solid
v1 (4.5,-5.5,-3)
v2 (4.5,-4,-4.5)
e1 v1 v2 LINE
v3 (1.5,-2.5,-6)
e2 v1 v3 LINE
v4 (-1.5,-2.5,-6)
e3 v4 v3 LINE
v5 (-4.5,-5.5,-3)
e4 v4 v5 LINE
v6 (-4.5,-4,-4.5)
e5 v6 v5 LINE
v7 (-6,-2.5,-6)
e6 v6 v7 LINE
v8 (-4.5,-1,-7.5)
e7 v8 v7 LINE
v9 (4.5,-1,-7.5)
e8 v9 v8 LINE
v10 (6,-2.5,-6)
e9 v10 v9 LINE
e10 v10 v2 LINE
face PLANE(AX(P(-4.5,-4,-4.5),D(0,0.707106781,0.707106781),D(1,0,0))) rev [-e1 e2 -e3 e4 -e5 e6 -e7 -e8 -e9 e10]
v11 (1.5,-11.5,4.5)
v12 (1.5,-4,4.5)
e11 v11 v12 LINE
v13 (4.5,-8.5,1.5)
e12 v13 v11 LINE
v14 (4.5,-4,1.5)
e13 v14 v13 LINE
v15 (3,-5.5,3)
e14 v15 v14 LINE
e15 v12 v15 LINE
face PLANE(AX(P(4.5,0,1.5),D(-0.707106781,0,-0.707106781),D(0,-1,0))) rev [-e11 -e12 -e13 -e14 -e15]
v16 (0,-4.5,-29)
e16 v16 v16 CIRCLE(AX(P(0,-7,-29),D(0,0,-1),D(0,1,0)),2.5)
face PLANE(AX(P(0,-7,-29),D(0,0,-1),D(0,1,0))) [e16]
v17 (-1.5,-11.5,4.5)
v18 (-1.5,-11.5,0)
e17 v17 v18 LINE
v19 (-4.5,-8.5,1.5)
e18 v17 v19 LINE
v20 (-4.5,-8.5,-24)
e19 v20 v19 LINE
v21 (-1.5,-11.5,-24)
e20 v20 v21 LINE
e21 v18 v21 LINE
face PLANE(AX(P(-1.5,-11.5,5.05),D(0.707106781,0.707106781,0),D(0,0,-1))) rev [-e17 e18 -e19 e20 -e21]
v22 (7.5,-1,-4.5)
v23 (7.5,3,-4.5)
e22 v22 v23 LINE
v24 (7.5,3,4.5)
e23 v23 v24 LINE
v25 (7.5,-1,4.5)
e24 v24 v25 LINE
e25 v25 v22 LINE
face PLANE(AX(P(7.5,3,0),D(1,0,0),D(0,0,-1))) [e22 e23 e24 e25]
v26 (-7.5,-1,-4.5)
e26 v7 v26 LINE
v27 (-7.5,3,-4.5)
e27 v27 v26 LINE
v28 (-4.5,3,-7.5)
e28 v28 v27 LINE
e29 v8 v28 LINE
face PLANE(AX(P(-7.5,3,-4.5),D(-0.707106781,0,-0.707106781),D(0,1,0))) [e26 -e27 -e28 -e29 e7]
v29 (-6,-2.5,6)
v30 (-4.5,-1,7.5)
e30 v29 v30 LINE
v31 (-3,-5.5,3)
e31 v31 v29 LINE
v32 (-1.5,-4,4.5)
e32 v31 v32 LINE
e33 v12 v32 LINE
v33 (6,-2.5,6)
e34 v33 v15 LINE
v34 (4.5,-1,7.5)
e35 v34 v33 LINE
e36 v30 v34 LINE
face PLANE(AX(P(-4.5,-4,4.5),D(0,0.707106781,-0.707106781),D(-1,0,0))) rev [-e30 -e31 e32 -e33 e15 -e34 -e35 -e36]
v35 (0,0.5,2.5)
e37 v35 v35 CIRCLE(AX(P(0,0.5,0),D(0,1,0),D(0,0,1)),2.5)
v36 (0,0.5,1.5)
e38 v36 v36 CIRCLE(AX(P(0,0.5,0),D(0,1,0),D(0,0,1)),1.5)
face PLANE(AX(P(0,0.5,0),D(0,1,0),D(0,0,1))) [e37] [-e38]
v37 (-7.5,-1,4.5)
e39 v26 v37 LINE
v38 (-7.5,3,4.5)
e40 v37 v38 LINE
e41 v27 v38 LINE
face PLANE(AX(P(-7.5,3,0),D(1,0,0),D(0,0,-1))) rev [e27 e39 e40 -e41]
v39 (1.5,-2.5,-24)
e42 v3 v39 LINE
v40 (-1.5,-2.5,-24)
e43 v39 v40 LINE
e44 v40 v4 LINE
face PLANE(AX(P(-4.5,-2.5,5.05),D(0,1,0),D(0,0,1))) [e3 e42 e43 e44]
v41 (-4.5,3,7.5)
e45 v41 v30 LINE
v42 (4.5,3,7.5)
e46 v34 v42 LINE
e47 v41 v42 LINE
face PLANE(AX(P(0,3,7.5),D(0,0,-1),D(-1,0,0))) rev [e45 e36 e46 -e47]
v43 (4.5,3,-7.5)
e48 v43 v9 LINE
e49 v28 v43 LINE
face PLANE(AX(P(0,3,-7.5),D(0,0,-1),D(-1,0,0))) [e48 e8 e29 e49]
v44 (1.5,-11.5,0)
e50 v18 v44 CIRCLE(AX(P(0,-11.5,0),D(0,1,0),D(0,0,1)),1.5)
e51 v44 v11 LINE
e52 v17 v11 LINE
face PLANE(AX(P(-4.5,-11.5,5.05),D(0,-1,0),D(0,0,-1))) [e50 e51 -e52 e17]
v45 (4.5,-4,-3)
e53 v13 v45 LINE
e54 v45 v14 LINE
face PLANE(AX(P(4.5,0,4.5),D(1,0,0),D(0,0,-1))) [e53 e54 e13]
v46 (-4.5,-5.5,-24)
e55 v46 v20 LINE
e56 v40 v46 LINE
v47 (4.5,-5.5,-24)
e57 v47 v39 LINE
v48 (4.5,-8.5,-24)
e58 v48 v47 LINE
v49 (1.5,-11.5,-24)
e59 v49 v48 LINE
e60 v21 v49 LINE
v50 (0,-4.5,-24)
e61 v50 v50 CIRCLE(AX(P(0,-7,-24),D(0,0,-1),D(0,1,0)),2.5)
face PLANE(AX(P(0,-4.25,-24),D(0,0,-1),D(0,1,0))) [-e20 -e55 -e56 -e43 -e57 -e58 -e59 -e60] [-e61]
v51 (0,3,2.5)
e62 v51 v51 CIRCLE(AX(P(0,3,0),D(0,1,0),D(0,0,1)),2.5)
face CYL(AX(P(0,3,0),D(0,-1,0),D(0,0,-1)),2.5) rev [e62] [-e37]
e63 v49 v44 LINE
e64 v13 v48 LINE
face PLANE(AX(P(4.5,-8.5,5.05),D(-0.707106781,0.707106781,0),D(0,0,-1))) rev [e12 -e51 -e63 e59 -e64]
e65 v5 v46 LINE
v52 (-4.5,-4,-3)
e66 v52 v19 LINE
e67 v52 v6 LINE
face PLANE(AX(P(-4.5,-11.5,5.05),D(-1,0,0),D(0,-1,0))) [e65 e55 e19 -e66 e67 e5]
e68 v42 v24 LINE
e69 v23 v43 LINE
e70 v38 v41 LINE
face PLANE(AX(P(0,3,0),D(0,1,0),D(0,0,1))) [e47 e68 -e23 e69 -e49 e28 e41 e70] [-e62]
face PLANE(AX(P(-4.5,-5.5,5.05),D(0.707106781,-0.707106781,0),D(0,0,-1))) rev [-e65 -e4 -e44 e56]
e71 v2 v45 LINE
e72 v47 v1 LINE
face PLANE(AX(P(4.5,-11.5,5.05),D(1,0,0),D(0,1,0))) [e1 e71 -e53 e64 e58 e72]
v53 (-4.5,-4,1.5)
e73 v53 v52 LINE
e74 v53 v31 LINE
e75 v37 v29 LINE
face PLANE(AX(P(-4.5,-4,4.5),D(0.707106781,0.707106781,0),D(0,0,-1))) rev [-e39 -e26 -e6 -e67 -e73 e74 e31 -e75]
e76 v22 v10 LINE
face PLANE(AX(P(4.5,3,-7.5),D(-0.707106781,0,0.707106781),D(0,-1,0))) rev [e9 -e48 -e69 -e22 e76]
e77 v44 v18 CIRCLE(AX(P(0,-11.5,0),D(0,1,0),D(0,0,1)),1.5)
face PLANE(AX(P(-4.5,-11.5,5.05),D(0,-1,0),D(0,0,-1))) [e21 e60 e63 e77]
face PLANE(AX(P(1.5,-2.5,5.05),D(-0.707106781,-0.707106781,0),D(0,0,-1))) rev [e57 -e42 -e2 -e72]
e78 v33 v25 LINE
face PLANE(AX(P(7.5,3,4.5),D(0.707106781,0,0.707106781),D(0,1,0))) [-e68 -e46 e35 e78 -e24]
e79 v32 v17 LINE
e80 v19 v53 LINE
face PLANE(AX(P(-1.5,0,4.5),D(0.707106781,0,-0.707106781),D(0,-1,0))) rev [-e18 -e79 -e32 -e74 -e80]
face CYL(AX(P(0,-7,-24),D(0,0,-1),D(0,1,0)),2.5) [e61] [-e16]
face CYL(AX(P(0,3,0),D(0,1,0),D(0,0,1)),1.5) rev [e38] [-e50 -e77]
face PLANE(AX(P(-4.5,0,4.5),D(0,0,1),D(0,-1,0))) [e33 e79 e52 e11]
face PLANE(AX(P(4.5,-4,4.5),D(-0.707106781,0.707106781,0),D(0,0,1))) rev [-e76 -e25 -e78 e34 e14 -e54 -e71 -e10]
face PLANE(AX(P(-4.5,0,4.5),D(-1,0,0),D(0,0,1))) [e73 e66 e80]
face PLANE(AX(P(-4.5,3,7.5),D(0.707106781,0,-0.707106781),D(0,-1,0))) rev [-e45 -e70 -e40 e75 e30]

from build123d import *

# Parameters (mm, degrees)
SKETCH1_W                = 15
SKETCH1_H                = 15
SKETCH1_R                = 2.5
BOSS_EXTRUDE1_DEPTH      = 3
CHAMFER1_SIZE            = 3
SKETCH1_6_R              = 2.5
BOSS_EXTRUDE3_DEPTH      = 0.5
SKETCH18_W               = 9
SKETCH18_H               = 9
CHAMFER4_SIZE            = 4
CHAMFER5_SIZE            = 3
SKETCH19_OUTSIDE_W       = 25.408
SKETCH19_OUTSIDE_H       = 24.908
SKETCH19_OUTSIDE_R       = 2.5
CUT_EXTRUDE2_DEPTH       = 5
F_3_0_3_DIAMETER_HOLE1_D = 3


with BuildPart() as part:
    # Sketch1 → Boss-Extrude1 (new body)
    with BuildSketch(Plane(origin=(0, 0, 0), x_dir=(1, 0, 0), z_dir=(0, 1, 0))):
        Rectangle(SKETCH1_W, SKETCH1_H)
        with Locations(Location((0, 0, 0), (0, 0, 270))):
            Circle(SKETCH1_R, mode=Mode.SUBTRACT)
    extrude(amount=BOSS_EXTRUDE1_DEPTH)

    # Chamfer1
    chamfer1_edges = [part.edges().sort_by_distance(p)[0] for p in [
        (7.5, 1.5, 7.5),
        (-7.5, 1.5, 7.5),
        (-7.5, 1.5, -7.5),
        (7.5, 1.5, -7.5),
    ]]
    chamfer(chamfer1_edges, length=CHAMFER1_SIZE)

    # Sketch1<6> → Boss-Extrude3 (add)
    with BuildSketch(Plane(origin=(0, 0, 0), x_dir=(1, 0, 0), z_dir=(0, 1, 0))):
        with Locations(Location((0, 0, 0), (0, 0, 270))):
            Circle(SKETCH1_6_R)
    extrude(amount=BOSS_EXTRUDE3_DEPTH)

    # Sweep3: sweep along a path in Sketch2
    with BuildLine(Plane(origin=(0, 0, 0), x_dir=(0, 0, -1), z_dir=(1, 0, 0))) as sweep3_path:
        Line((0, 0), (0, -7))
        Line((0, -7), (29, -7))
    # Sketch18 → Sweep3 (sweep)
    with BuildSketch(Plane.XZ):
        Rectangle(SKETCH18_W, SKETCH18_H)
    sweep(path=sweep3_path.line, transition=Transition.RIGHT)

    # Chamfer4
    # the kernel refuses this chamfer: 4 mm, written as the material it adds along each edge
    with BuildSketch(Plane(origin=(-14.786731952, 0, -4.5), x_dir=(0, 0, -1), z_dir=(1, 0, 0))) as chamfer4_piece_1_section:
        Polygon((CHAMFER4_SIZE, 0), (0, -CHAMFER4_SIZE), (0, 0), align=None)
    chamfer4_piece_1 = extrude(amount=29.573463904, mode=Mode.PRIVATE)
    chamfer4_piece_1 = split(chamfer4_piece_1, bisect_by=Plane(origin=(-14.786731952, 0, -7.5), z_dir=(0, 0, 1)), keep=Keep.TOP, mode=Mode.PRIVATE)
    chamfer4_piece_1 = split(chamfer4_piece_1, bisect_by=Plane(origin=(-11.143365976, 0, -0.856634024), z_dir=(0.7071067811865476, 0, 0.7071067811865476)), keep=Keep.TOP, mode=Mode.PRIVATE)
    chamfer4_piece_1 = split(chamfer4_piece_1, bisect_by=Plane(origin=(-3.643365976, 0, -15.643365976), z_dir=(-0.7071067811865476, 0, 0.7071067811865476)), keep=Keep.TOP, mode=Mode.PRIVATE)
    chamfer4_piece_1 = split(chamfer4_piece_1, bisect_by=Plane(origin=(-11.643365976, 3.143365976, -4.5), z_dir=(0.7071067811865476, 0.7071067811865475, 0)), keep=Keep.TOP, mode=Mode.PRIVATE)
    chamfer4_piece_1 = split(chamfer4_piece_1, bisect_by=Plane(origin=(-3.143365976, -11.643365976, -4.5), z_dir=(-0.7071067811865476, 0.7071067811865475, 0)), keep=Keep.TOP, mode=Mode.PRIVATE)
    add(chamfer4_piece_1)
    with BuildSketch(Plane(origin=(4.5, 0, -14.786731952), x_dir=(1, 0, 0), z_dir=(0, 0, 1))) as chamfer4_piece_2_section:
        Polygon((CHAMFER4_SIZE, 0), (0, -CHAMFER4_SIZE), (0, 0), align=None)
    chamfer4_piece_2 = extrude(amount=29.573463904, mode=Mode.PRIVATE)
    chamfer4_piece_2 = split(chamfer4_piece_2, bisect_by=Plane(origin=(0.856634024, 0, -11.143365976), z_dir=(-0.7071067811865476, 0, 0.7071067811865476)), keep=Keep.TOP, mode=Mode.PRIVATE)
    chamfer4_piece_2 = split(chamfer4_piece_2, bisect_by=Plane(origin=(7.5, 0, -14.786731952), z_dir=(-1, 0, 0)), keep=Keep.TOP, mode=Mode.PRIVATE)
    chamfer4_piece_2 = split(chamfer4_piece_2, bisect_by=Plane(origin=(15.643365976, 0, -3.643365976), z_dir=(-0.7071067811865476, 0, -0.7071067811865476)), keep=Keep.TOP, mode=Mode.PRIVATE)
    chamfer4_piece_2 = split(chamfer4_piece_2, bisect_by=Plane(origin=(4.5, 3.143365976, -11.643365976), z_dir=(0, 0.7071067811865475, 0.7071067811865476)), keep=Keep.TOP, mode=Mode.PRIVATE)
    chamfer4_piece_2 = split(chamfer4_piece_2, bisect_by=Plane(origin=(4.5, -11.643365976, -3.143365976), z_dir=(0, 0.7071067811865477, -0.7071067811865475)), keep=Keep.TOP, mode=Mode.PRIVATE)
    add(chamfer4_piece_2)
    with BuildSketch(Plane(origin=(14.786731952, 0, 4.5), x_dir=(0, 0, 1), z_dir=(-1, 0, 0))) as chamfer4_piece_3_section:
        Polygon((CHAMFER4_SIZE, 0), (0, -CHAMFER4_SIZE), (0, 0), align=None)
    chamfer4_piece_3 = extrude(amount=29.573463904, mode=Mode.PRIVATE)
    chamfer4_piece_3 = split(chamfer4_piece_3, bisect_by=Plane(origin=(3.643365976, 0, 15.643365976), z_dir=(0.7071067811865476, 0, -0.7071067811865476)), keep=Keep.TOP, mode=Mode.PRIVATE)
    chamfer4_piece_3 = split(chamfer4_piece_3, bisect_by=Plane(origin=(11.143365976, 0, 0.856634024), z_dir=(-0.7071067811865476, 0, -0.7071067811865476)), keep=Keep.TOP, mode=Mode.PRIVATE)
    chamfer4_piece_3 = split(chamfer4_piece_3, bisect_by=Plane(origin=(14.786731952, 0, 7.5), z_dir=(0, 0, -1)), keep=Keep.TOP, mode=Mode.PRIVATE)
    chamfer4_piece_3 = split(chamfer4_piece_3, bisect_by=Plane(origin=(3.143365976, -11.643365976, 4.5), z_dir=(0.7071067811865476, 0.7071067811865475, 0)), keep=Keep.TOP, mode=Mode.PRIVATE)
    chamfer4_piece_3 = split(chamfer4_piece_3, bisect_by=Plane(origin=(11.643365976, 3.143365976, 4.5), z_dir=(-0.7071067811865476, 0.7071067811865475, 0)), keep=Keep.TOP, mode=Mode.PRIVATE)
    add(chamfer4_piece_3)
    with BuildSketch(Plane(origin=(-4.5, 0, 14.786731952), x_dir=(-1, 0, 0), z_dir=(0, 0, -1))) as chamfer4_piece_4_section:
        Polygon((CHAMFER4_SIZE, 0), (0, -CHAMFER4_SIZE), (0, 0), align=None)
    chamfer4_piece_4 = extrude(amount=29.573463904, mode=Mode.PRIVATE)
    chamfer4_piece_4 = split(chamfer4_piece_4, bisect_by=Plane(origin=(-15.643365976, 0, 3.643365976), z_dir=(0.7071067811865476, 0, 0.7071067811865476)), keep=Keep.TOP, mode=Mode.PRIVATE)
    chamfer4_piece_4 = split(chamfer4_piece_4, bisect_by=Plane(origin=(-7.5, 0, 14.786731952), z_dir=(1, 0, 0)), keep=Keep.TOP, mode=Mode.PRIVATE)
    chamfer4_piece_4 = split(chamfer4_piece_4, bisect_by=Plane(origin=(-0.856634024, 0, 11.143365976), z_dir=(0.7071067811865476, 0, -0.7071067811865476)), keep=Keep.TOP, mode=Mode.PRIVATE)
    chamfer4_piece_4 = split(chamfer4_piece_4, bisect_by=Plane(origin=(-4.5, -11.643365976, 3.143365976), z_dir=(0, 0.7071067811865475, 0.7071067811865476)), keep=Keep.TOP, mode=Mode.PRIVATE)
    chamfer4_piece_4 = split(chamfer4_piece_4, bisect_by=Plane(origin=(-4.5, 3.143365976, 11.643365976), z_dir=(0, 0.7071067811865477, -0.7071067811865475)), keep=Keep.TOP, mode=Mode.PRIVATE)
    add(chamfer4_piece_4)

    # Chamfer5
    # the kernel refuses this chamfer: 3 mm, written as the material it takes off along each edge
    with BuildSketch(Plane(origin=(4.5, -11.5, 12.215048964), x_dir=(-1, 0, 0), z_dir=(0, 0, -1))) as chamfer5_piece_1:
        Polygon((CHAMFER5_SIZE, 0), (0, CHAMFER5_SIZE), (0, 0), align=None)
    extrude(amount=48.930097928, mode=Mode.SUBTRACT)
    with BuildSketch(Plane(origin=(-4.5, -11.5, 12.215048964), x_dir=(1, 0, 0), z_dir=(0, 0, -1))) as chamfer5_piece_2:
        Polygon((CHAMFER5_SIZE, 0), (0, -CHAMFER5_SIZE), (0, 0), align=None)
    extrude(amount=48.930097928, mode=Mode.SUBTRACT)
    with BuildSketch(Plane(origin=(4.5, -2.5, 1.715048964), x_dir=(-1, 0, 0), z_dir=(0, 0, -1))) as chamfer5_piece_3_section:
        Polygon((CHAMFER5_SIZE, 0), (0, -CHAMFER5_SIZE), (0, 0), align=None)
    chamfer5_piece_3 = extrude(amount=38.430097928, mode=Mode.PRIVATE)
    chamfer5_piece_3 = split(chamfer5_piece_3, bisect_by=Plane(origin=(4.5, -6.357524482, -2.142475518), z_dir=(0, -0.7071067811865476, -0.7071067811865476)), keep=Keep.TOP, mode=Mode.PRIVATE)
    add(chamfer5_piece_3, mode=Mode.SUBTRACT)
    with BuildSketch(Plane(origin=(-4.5, -2.5, 1.715048964), x_dir=(1, 0, 0), z_dir=(0, 0, -1))) as chamfer5_piece_4_section:
        Polygon((CHAMFER5_SIZE, 0), (0, CHAMFER5_SIZE), (0, 0), align=None)
    chamfer5_piece_4 = extrude(amount=38.430097928, mode=Mode.PRIVATE)
    chamfer5_piece_4 = split(chamfer5_piece_4, bisect_by=Plane(origin=(-4.5, -6.357524482, -2.142475518), z_dir=(0, -0.7071067811865476, -0.7071067811865476)), keep=Keep.TOP, mode=Mode.PRIVATE)
    add(chamfer5_piece_4, mode=Mode.SUBTRACT)
    with BuildSketch(Plane(origin=(4.5, 3.715048964, 4.5), x_dir=(-1, 0, 0), z_dir=(0, -1, 0))) as chamfer5_piece_5_section:
        Polygon((CHAMFER5_SIZE, 0), (0, CHAMFER5_SIZE), (0, 0), align=None)
    chamfer5_piece_5 = extrude(amount=22.930097928, mode=Mode.PRIVATE)
    chamfer5_piece_5 = split(chamfer5_piece_5, bisect_by=Plane(origin=(8.357524482, -0.142475518, 4.5), z_dir=(0.7071067811865476, -0.7071067811865476, 0)), keep=Keep.TOP, mode=Mode.PRIVATE)
    add(chamfer5_piece_5, mode=Mode.SUBTRACT)
    with BuildSketch(Plane(origin=(4.5, 3.715048964, 4.5), x_dir=(-1, 0, 0), z_dir=(0, -1, 0))) as chamfer5_piece_6_section:
        Polygon((CHAMFER5_SIZE, 0), (0, CHAMFER5_SIZE), (0, 0), align=None)
    chamfer5_piece_6 = extrude(amount=22.930097928, mode=Mode.PRIVATE)
    chamfer5_piece_6 = split(chamfer5_piece_6, bisect_by=Plane(origin=(4.5, -0.142475518, 8.357524482), z_dir=(0, -0.7071067811865476, 0.7071067811865476)), keep=Keep.TOP, mode=Mode.PRIVATE)
    add(chamfer5_piece_6, mode=Mode.SUBTRACT)
    with BuildSketch(Plane(origin=(-4.5, 3.715048964, 4.5), x_dir=(1, 0, 0), z_dir=(0, -1, 0))) as chamfer5_piece_7_section:
        Polygon((CHAMFER5_SIZE, 0), (0, -CHAMFER5_SIZE), (0, 0), align=None)
    chamfer5_piece_7 = extrude(amount=22.930097928, mode=Mode.PRIVATE)
    chamfer5_piece_7 = split(chamfer5_piece_7, bisect_by=Plane(origin=(-8.357524482, -0.142475518, 4.5), z_dir=(-0.7071067811865476, -0.7071067811865476, 0)), keep=Keep.TOP, mode=Mode.PRIVATE)
    add(chamfer5_piece_7, mode=Mode.SUBTRACT)
    with BuildSketch(Plane(origin=(-4.5, 3.715048964, 4.5), x_dir=(1, 0, 0), z_dir=(0, -1, 0))) as chamfer5_piece_8_section:
        Polygon((CHAMFER5_SIZE, 0), (0, -CHAMFER5_SIZE), (0, 0), align=None)
    chamfer5_piece_8 = extrude(amount=22.930097928, mode=Mode.PRIVATE)
    chamfer5_piece_8 = split(chamfer5_piece_8, bisect_by=Plane(origin=(-4.5, -0.142475518, 8.357524482), z_dir=(0, -0.7071067811865476, 0.7071067811865476)), keep=Keep.TOP, mode=Mode.PRIVATE)
    add(chamfer5_piece_8, mode=Mode.SUBTRACT)

    # Sketch19 outside → Cut-Extrude2 (cut)
    with BuildSketch(Plane(origin=(0, 0, -29), x_dir=(-1, 0, 0), z_dir=(0, 0, -1))):
        with Locations((0, -4.25)):
            Rectangle(SKETCH19_OUTSIDE_W, SKETCH19_OUTSIDE_H)
        with Locations(Location((0, -7, 0), (0, 0, 90))):
            Circle(SKETCH19_OUTSIDE_R, mode=Mode.SUBTRACT)
    extrude(amount=-CUT_EXTRUDE2_DEPTH, mode=Mode.SUBTRACT)

    # Ø3.0 (3) Diameter Hole1 (through all)
    with Locations(Plane(origin=(0, 3, 0), x_dir=(1, 0, 0), z_dir=(0, 1, 0))):
        with Locations((0, 0)):
            Hole(F_3_0_3_DIAMETER_HOLE1_D / 2)


solid = part.part
